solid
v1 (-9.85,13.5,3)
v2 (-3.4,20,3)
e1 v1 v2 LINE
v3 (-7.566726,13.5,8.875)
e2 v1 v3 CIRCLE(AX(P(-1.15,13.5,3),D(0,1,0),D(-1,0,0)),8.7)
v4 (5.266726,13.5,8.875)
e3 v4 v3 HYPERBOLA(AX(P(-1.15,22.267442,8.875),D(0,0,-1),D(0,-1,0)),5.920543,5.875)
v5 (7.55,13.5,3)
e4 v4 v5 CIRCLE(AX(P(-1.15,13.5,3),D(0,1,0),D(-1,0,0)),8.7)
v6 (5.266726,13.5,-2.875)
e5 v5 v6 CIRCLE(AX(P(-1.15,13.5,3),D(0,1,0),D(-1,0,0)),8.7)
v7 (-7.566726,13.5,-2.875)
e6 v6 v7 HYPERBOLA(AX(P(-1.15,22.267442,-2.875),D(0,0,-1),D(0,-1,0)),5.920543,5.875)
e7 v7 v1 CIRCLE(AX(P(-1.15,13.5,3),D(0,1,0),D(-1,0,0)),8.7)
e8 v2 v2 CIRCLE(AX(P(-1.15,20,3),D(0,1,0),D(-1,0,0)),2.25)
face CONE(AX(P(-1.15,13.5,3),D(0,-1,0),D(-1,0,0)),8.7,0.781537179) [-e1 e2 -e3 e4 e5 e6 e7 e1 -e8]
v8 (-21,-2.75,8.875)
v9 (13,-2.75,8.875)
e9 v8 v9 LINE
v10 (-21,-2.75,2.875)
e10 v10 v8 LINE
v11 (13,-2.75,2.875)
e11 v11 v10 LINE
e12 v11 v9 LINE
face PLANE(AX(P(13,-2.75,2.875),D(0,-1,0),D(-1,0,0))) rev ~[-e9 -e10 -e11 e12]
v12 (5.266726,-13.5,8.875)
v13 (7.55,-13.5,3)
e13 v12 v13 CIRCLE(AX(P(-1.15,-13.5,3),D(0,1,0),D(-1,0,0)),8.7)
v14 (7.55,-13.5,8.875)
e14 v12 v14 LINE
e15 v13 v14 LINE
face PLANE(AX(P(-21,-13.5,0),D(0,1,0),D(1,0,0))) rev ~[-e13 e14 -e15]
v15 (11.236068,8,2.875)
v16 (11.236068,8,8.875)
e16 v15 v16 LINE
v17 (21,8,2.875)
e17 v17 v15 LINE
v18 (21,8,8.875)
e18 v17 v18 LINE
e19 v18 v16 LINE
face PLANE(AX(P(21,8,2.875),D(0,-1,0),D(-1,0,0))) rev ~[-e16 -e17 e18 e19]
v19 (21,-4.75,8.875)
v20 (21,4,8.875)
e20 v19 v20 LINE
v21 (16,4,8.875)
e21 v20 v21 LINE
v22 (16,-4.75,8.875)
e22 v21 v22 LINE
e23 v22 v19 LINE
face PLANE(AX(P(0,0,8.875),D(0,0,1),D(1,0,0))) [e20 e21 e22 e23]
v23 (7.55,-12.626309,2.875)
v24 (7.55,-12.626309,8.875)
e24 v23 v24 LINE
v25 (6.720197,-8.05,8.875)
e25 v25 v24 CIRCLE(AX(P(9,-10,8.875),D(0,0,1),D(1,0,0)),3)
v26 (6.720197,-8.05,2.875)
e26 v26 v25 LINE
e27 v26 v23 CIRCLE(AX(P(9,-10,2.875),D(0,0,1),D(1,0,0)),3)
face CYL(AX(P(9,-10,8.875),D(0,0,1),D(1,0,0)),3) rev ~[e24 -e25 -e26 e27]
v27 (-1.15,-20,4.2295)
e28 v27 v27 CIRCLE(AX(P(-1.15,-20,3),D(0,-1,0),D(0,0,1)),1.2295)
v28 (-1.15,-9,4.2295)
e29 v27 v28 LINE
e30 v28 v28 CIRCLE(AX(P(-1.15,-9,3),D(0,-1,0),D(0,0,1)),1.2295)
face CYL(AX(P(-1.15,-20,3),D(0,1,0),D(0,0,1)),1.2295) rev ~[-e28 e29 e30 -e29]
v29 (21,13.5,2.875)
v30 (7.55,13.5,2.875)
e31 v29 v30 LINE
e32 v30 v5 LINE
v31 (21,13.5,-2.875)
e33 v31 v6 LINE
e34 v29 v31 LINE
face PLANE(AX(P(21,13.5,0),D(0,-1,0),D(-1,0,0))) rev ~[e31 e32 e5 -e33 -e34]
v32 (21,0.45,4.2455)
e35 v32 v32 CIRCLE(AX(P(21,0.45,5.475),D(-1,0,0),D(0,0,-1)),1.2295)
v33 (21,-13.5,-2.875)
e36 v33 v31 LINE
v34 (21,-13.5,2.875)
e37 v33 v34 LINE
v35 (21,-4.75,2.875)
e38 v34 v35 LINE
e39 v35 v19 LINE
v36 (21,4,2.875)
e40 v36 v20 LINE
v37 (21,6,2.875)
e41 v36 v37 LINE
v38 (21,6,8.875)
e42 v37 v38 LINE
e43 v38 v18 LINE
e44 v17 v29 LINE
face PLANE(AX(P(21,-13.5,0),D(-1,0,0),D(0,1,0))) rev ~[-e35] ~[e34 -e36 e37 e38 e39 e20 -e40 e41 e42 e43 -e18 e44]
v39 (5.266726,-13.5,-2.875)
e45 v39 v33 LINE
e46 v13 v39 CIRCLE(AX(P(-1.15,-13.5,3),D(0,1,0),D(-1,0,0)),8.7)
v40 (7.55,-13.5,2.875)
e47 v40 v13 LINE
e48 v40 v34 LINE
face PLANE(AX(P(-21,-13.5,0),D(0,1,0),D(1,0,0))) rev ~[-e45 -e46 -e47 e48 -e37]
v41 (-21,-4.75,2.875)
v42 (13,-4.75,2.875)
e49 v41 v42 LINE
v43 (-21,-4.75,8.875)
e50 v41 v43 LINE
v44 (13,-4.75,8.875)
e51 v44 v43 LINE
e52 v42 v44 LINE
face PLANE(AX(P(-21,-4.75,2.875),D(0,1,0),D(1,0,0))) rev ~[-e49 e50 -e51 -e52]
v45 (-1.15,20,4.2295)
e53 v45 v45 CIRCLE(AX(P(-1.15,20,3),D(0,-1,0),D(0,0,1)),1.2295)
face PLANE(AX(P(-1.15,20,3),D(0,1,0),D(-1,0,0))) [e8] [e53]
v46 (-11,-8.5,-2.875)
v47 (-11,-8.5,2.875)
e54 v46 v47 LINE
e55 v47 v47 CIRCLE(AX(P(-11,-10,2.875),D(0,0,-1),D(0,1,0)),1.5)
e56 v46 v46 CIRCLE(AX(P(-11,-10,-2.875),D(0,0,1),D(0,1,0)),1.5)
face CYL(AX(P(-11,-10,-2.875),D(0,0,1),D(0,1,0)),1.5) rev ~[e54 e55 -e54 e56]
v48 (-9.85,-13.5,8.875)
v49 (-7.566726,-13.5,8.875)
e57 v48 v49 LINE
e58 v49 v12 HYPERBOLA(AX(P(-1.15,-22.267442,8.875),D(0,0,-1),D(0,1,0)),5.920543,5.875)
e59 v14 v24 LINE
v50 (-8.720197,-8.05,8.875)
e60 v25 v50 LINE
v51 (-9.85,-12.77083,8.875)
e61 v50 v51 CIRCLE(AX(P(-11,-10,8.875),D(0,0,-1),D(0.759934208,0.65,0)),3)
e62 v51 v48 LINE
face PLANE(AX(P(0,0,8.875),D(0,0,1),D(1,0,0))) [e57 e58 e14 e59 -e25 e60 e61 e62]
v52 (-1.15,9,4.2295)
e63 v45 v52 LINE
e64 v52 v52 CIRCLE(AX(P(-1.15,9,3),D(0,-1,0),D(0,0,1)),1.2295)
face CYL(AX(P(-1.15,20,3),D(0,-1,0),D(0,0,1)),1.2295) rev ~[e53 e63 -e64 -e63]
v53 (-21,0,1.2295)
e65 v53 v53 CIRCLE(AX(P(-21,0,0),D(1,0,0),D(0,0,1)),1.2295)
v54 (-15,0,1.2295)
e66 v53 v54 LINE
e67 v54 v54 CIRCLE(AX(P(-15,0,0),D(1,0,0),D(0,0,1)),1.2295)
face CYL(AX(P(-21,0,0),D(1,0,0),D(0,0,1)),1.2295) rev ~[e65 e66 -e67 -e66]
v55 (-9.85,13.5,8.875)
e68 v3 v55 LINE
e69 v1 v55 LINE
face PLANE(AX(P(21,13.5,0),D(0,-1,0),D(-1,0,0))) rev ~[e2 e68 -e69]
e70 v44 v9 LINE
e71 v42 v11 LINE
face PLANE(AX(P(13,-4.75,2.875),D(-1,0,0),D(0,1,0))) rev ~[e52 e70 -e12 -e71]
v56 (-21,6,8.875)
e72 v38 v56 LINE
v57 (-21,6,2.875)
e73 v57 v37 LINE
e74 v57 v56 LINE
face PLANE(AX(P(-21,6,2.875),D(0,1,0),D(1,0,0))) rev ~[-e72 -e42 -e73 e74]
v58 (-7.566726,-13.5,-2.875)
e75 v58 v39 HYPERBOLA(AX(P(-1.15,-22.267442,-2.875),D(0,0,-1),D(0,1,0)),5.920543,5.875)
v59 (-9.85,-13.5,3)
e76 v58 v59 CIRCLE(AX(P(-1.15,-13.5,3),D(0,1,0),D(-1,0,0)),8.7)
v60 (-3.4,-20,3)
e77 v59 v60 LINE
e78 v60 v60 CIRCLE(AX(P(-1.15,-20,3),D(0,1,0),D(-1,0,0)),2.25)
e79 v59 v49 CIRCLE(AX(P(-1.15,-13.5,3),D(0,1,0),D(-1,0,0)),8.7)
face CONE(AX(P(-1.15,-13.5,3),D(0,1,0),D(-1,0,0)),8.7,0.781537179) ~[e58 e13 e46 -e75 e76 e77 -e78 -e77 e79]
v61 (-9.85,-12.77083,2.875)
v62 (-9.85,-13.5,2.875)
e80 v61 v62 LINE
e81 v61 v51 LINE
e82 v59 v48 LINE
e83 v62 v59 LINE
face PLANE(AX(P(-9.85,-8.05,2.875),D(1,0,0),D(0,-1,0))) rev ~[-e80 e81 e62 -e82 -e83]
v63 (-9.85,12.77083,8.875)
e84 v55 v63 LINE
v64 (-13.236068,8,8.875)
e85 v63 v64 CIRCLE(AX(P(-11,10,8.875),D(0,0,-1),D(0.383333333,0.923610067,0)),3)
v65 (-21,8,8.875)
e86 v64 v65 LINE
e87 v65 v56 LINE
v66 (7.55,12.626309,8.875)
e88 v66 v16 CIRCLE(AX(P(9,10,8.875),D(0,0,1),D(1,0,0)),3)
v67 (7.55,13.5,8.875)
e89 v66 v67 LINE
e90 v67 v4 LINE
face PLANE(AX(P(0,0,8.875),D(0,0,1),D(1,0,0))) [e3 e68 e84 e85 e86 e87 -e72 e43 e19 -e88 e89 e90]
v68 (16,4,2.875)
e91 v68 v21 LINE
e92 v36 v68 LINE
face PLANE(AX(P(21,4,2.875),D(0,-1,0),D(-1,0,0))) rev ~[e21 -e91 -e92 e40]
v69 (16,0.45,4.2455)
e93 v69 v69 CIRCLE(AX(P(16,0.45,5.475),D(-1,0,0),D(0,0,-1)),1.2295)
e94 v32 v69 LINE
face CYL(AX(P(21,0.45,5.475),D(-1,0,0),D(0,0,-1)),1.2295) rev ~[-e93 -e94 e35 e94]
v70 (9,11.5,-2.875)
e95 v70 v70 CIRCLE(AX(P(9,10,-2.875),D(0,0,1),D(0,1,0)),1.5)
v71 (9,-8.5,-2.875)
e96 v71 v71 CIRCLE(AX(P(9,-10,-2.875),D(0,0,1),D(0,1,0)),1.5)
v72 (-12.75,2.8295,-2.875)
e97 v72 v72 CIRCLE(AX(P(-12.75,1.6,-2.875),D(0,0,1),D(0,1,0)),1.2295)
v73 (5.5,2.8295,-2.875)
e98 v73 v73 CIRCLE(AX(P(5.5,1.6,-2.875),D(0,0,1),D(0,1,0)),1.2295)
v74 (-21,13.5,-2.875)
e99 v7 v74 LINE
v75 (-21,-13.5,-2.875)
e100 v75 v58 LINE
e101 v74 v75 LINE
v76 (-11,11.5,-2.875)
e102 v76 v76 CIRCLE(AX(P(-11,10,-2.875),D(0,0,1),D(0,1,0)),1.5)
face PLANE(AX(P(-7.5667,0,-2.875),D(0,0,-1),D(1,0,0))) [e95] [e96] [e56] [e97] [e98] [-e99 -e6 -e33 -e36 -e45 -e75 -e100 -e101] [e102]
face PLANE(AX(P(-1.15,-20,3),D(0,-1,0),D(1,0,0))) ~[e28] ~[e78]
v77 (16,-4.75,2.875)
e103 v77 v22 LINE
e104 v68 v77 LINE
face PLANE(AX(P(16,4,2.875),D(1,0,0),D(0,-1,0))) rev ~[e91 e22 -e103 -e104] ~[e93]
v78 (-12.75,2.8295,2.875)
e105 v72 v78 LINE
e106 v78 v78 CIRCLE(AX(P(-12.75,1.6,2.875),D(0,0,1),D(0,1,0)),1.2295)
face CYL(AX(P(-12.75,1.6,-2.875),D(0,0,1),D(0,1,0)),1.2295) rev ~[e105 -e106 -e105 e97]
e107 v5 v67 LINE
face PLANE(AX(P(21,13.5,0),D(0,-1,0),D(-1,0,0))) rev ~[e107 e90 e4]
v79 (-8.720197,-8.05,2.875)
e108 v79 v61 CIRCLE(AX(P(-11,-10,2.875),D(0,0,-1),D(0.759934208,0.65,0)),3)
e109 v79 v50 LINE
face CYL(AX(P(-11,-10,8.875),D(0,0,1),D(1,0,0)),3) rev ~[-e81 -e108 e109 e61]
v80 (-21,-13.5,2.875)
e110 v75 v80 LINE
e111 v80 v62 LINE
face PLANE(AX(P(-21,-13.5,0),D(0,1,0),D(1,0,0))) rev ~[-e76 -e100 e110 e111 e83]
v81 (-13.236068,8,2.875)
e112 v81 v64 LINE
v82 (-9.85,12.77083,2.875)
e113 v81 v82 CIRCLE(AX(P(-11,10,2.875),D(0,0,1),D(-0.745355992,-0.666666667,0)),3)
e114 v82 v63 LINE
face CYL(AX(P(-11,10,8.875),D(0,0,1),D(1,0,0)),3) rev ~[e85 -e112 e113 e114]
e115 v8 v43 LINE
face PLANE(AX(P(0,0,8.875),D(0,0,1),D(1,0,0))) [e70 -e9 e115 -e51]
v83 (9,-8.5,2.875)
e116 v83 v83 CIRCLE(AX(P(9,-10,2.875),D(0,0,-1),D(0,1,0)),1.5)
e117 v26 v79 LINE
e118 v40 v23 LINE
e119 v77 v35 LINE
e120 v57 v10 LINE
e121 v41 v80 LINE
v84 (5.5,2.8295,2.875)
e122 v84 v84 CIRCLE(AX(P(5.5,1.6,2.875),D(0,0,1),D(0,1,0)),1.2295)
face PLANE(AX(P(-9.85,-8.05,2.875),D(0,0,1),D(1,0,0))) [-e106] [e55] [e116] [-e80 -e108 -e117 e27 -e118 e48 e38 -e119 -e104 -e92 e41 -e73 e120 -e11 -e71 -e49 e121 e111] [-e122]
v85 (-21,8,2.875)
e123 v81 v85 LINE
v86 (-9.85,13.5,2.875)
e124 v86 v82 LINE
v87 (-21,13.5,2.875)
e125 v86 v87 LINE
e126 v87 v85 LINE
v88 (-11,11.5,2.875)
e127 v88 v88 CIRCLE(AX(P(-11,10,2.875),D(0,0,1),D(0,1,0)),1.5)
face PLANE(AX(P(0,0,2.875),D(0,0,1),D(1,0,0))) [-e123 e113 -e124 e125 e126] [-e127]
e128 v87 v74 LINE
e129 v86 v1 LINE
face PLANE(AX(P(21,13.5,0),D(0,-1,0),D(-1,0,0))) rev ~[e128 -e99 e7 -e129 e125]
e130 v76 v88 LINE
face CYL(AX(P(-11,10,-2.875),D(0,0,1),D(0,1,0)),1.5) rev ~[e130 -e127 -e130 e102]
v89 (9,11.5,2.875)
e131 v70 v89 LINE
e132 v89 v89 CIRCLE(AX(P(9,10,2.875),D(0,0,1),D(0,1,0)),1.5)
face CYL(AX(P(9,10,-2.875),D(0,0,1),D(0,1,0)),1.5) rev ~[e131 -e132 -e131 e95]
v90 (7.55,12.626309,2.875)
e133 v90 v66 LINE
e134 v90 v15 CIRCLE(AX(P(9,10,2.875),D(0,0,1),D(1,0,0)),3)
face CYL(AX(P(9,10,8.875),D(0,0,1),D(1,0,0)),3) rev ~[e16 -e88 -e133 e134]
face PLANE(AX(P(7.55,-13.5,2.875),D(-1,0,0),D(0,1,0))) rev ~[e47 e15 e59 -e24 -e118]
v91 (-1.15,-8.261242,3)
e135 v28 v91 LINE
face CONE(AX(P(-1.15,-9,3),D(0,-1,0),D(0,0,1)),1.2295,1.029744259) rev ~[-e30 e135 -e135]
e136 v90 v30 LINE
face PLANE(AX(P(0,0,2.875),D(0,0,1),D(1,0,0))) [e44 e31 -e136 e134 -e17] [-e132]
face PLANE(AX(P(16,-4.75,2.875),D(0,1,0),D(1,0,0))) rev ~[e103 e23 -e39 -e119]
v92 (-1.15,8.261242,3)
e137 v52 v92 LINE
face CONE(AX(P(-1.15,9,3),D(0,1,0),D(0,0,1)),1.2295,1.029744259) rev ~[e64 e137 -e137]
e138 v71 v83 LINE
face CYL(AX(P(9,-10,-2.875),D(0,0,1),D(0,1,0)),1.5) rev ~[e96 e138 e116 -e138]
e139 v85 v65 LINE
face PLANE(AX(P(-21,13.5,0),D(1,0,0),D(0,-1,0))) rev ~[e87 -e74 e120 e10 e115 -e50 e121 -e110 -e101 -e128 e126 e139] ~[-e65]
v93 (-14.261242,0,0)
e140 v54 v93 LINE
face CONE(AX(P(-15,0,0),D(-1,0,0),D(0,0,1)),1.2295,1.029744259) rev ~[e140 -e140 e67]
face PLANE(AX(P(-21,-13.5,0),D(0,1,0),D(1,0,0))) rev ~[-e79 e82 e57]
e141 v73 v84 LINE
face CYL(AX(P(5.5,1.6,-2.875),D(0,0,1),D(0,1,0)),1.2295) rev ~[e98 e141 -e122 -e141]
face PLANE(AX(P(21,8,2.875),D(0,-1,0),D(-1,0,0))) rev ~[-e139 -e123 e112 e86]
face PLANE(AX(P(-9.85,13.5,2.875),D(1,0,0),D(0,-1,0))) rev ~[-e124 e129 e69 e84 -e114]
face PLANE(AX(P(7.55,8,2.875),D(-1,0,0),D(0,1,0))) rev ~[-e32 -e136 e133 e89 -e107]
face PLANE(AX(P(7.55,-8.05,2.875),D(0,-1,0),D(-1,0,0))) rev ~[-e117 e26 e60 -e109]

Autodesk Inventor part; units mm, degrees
ref_plane "YZ Plane" through (0, 0, 0) normal (1, 0, 0) x (0, 1, 0)
ref_plane "XZ Plane" through (0, 0, 0) normal (0, 1, 0) x (-1, 0, 0)
sketch "Esquisse1" plane through (0, 0, 0) normal (0, 0, 1) x (1, 0, 0)
  line L0 (-21, -13.5) -> (21, -13.5)
  line L1 (21, -13.5) -> (21, 13.5)
  line L2 (21, 13.5) -> (-21, 13.5)
  line L3 (-21, 13.5) -> (-21, -13.5)
  line L4 (-21, -13.5) -> (21, 13.5) construction
  line L5 (21, -13.5) -> (-21, 13.5) construction
  point P0 (0, 0)
  dimension "d0" = 42
  dimension "d1" = 27
extrude "Extrusion1" add sketch "Esquisse1" along normal mid plane 5.75
sketch "Esquisse2" plane through (0, 0, 2.875) normal (0, 0, 1) x (1, 0, 0)
  line L0 (16, -4.75) -> (21, -4.75)
  line L1 (21, -4.75) -> (21, 4)
  line L2 (21, 4) -> (16, 4)
  line L3 (16, 4) -> (16, -4.75)
  line L4 (-21, 6) -> (21, 6)
  line L5 (21, 6) -> (21, 8)
  line L6 (21, 8) -> (-21, 8)
  line L7 (-21, 8) -> (-21, 6)
  line L8 (-21, -4.75) -> (13, -4.75)
  line L9 (13, -4.75) -> (13, -2.75)
  line L10 (13, -2.75) -> (-21, -2.75)
  line L11 (-21, -2.75) -> (-21, -4.75)
  line L12 (-21, -13.5) -> (21, -13.5) construction
  line L13 (21, -13.5) -> (21, 13.5) construction
  line L14 (21, 13.5) -> (-21, 13.5) construction
  line L15 (-21, 13.5) -> (-21, -13.5) construction
  point P0 (0, 0)
  dimension "d4" = 2
  dimension "d5" = 2
  dimension "d6" = 5
  dimension "d7" = 8.75
  dimension "d8" = 2
  dimension "d9" = 5.5
  dimension "d10" = 34
extrude "Extrusion2" add sketch "Esquisse2" along normal blind 6
sketch "Esquisse3" plane through (0, 0, 2.875) normal (0, 0, 1) x (1, 0, 0)
  line L0 (-9.85, 8) -> (7.55, 8)
  line L1 (7.55, 8) -> (7.55, 13.5)
  line L2 (7.55, 13.5) -> (-9.85, 13.5)
  line L3 (-9.85, 13.5) -> (-9.85, 8)
  line L4 (-21, 6) -> (21, 6) construction
  line L5 (21, 6) -> (21, 8) construction
  line L6 (21, 8) -> (-21, 8) construction
  line L7 (-21, 8) -> (-21, 6) construction
  line L8 (-21, 8) -> (21, 8) construction
  line L9 (21, 8) -> (21, 13.5) construction
  line L10 (21, 13.5) -> (-21, 13.5) construction
  line L11 (-21, 13.5) -> (-21, 8) construction
  line L12 (21, 8) -> (-21, 8) construction
  line L13 (-21, -13.5) -> (21, -13.5) projected
  line L14 (-9.85, -13.5) -> (7.55, -13.5)
  line L15 (7.55, -13.5) -> (7.55, -8.05)
  line L16 (7.55, -8.05) -> (-9.85, -8.05)
  line L17 (-9.85, -8.05) -> (-9.85, -13.5)
  line L18 (-21, -4.75) -> (13, -4.75) projected
  point P0 (0, 0)
  dimension "d13" = 17.4
  dimension "d14" = 11.15
  dimension "d17" = 3.3
extrude "Extrusion3" add sketch "Esquisse3" along normal up to surface (6 mm away)
ref_plane "Plan de construction1" through (-9.85, -13.5, 3) normal (0, 0, 1) x (1, 0, 0)
sketch "Esquisse5" plane through (-9.85, -13.5, 3) normal (0, 0, 1) x (1, 0, 0)
  line L0 (8.7, 27) -> (8.7, 37.7161)
  line L1 (0, 27) -> (17.4, 27) projected
  line L2 (0, 27) -> (6.45, 33.5)
  line L3 (6.45, 33.5) -> (8.7, 33.5)
  line L4 (0, 27) -> (8.7, 27)
  line L5 (-11.15, 27) -> (30.85, 27) projected
  point P0 (9.85, 13.5)
  dimension "d18" = 4.5
  dimension "d19" = 6.5
revolve "Révolution1" add sketch "Esquisse5" angle 360 about axis through (-1.15, 13.5, 3) along (0, 1, 0)
sketch "Esquisse7" plane through (-1.15, 20, 3) normal (0, 1, 0) x (1, 0, 0)
  circle A0 centre (0, 0) radius 2.25 construction
  point P0 (1.15, 3)
hole "Perçage1" at (-1.15, 20, 3) direction (0, -1, 0) diameter 2.459 depth 11 tip angle 118 thread size "M3x0.5" class "6H" standard "ISO Metric profile"
mirror "Symétrie2" about plane through (0, 0, 0) normal (0, 1, 0) of "Révolution1", "Perçage1"
sketch "Esquisse6" plane through (0, 0, 0) normal (0, 1, 0) x (-1, 0, 0)
  line L0 (7.5667, 8.875) -> (-5.2667, 8.875) projected
  arc A0 (7.5667, 8.875) -> (-5.2667, 8.875) centre (1.15, 3) ccw projected
  line L1 (7.5667, -2.875) -> (-5.2667, -2.875) projected
  arc A1 (-5.2667, -2.875) -> (7.5667, -2.875) centre (1.15, 3) ccw projected
  point P0 (0, 0)
extrude "Extrusion4" cut sketch "Esquisse6" along normal through all both and the other way through all
sketch "Esquisse8" plane through (-21, -13.5, -2.875) normal (-1, 0, 0) x (0, 0, 1)
  point P0 (2.875, 13.5)
  point P1 (2.875, 13.5)
hole "Perçage2" at (-21, 0, 0) direction (1, 0, 0) diameter 2.459 depth 6 tip angle 118 thread size "M3x0.5" class "6H" standard "ISO Metric profile"
sketch "Esquisse9" plane through (21, -13.5, -2.875) normal (1, 0, 0) x (0, 0, -1)
  line L0 (-11.75, 8.75) -> (-11.75, 17.5) projected
  line L1 (-5.75, 17.5) -> (-11.75, 17.5) projected
  point P0 (-2.875, 13.5)
  point P1 (-8.35, 13.95)
  dimension "d37" = 3.4
  dimension "d38" = 3.55
hole "Perçage3" at (21, 0.45, 5.475) direction (-1, 0, 0) diameter 2.459 end through all thread size "M3x0.5" class "6H" standard "ISO Metric profile"
sketch "Esquisse10" plane through (0, 0, -2.875) normal (0, 0, -1) x (-1, 0, 0)
  line L0 (21, -13.5) -> (21, 13.5) projected
  point P0 (0, 0)
  point P1 (-9, -10)
  point P2 (-9, 10)
  point P3 (11, 10)
  point P4 (11, -10)
  dimension "d46" = 20
  dimension "d47" = 20
  dimension "d48" = 10
  dimension "d49" = 10
hole "Perçage4" at (9, -10, -2.875) at (9, 10, -2.875) at (-11, 10, -2.875) at (-11, -10, -2.875) direction (0, 0, 1) diameter 3 end through all
sketch "Esquisse11" plane through (0, 0, -2.875) normal (0, 0, -1) x (-1, 0, 0)
  line L0 (21, -13.5) -> (21, 13.5) projected
  line L1 (21, 13.5) -> (7.5667, 13.5) projected
  point P0 (0, 0)
  point P1 (-5.5, 1.6)
  point P2 (12.75, 1.6)
  dimension "d57" = 18.25
  dimension "d58" = 8.25
  dimension "d59" = 11.9
hole "Perçage5" at (5.5, 1.6, -2.875) at (-12.75, 1.6, -2.875) direction (0, 0, 1) diameter 2.459 end through all thread size "M3x0.5" class "6H" standard "ISO Metric profile"
sketch "Esquisse12" plane through (-9.85, -8.05, 8.875) normal (0, 0, 1) x (1, 0, 0)
  arc A0 (17.4, -2.3341) -> (17.4, -1.5659) centre (18.85, -1.95) ccw construction
  arc A1 (0, -0.9869) -> (0, -2.9131) centre (-1.15, -1.95) ccw construction
  arc A2 (0, 19.0131) -> (0, 17.0869) centre (-1.15, 18.05) ccw construction
  arc A3 (17.4, 17.6659) -> (17.4, 18.4341) centre (18.85, 18.05) ccw construction
  circle A4 centre (18.85, -1.95) radius 3
  circle A5 centre (-1.15, -1.95) radius 1.5 projected
  circle A6 centre (-1.15, -1.95) radius 3
  circle A7 centre (-1.15, 18.05) radius 3
  circle A8 centre (18.85, 18.05) radius 1.5 projected
  circle A9 centre (18.85, 18.05) radius 3
  point P0 (9.85, 8.05)
  dimension "d67" = 6
  dimension "d68" = 6
  dimension "d69" = 6
  dimension "d70" = 6
extrude "Extrusion5" cut sketch "Esquisse12" against normal up to surface (6 mm away)
equation "\"d48\" = 0.5 * d47"
equation "\"d68\" = d67"
equation "\"d69\" = d67"
equation "\"d70\" = d68"
properties part number "Platine" material "Aluminium"
